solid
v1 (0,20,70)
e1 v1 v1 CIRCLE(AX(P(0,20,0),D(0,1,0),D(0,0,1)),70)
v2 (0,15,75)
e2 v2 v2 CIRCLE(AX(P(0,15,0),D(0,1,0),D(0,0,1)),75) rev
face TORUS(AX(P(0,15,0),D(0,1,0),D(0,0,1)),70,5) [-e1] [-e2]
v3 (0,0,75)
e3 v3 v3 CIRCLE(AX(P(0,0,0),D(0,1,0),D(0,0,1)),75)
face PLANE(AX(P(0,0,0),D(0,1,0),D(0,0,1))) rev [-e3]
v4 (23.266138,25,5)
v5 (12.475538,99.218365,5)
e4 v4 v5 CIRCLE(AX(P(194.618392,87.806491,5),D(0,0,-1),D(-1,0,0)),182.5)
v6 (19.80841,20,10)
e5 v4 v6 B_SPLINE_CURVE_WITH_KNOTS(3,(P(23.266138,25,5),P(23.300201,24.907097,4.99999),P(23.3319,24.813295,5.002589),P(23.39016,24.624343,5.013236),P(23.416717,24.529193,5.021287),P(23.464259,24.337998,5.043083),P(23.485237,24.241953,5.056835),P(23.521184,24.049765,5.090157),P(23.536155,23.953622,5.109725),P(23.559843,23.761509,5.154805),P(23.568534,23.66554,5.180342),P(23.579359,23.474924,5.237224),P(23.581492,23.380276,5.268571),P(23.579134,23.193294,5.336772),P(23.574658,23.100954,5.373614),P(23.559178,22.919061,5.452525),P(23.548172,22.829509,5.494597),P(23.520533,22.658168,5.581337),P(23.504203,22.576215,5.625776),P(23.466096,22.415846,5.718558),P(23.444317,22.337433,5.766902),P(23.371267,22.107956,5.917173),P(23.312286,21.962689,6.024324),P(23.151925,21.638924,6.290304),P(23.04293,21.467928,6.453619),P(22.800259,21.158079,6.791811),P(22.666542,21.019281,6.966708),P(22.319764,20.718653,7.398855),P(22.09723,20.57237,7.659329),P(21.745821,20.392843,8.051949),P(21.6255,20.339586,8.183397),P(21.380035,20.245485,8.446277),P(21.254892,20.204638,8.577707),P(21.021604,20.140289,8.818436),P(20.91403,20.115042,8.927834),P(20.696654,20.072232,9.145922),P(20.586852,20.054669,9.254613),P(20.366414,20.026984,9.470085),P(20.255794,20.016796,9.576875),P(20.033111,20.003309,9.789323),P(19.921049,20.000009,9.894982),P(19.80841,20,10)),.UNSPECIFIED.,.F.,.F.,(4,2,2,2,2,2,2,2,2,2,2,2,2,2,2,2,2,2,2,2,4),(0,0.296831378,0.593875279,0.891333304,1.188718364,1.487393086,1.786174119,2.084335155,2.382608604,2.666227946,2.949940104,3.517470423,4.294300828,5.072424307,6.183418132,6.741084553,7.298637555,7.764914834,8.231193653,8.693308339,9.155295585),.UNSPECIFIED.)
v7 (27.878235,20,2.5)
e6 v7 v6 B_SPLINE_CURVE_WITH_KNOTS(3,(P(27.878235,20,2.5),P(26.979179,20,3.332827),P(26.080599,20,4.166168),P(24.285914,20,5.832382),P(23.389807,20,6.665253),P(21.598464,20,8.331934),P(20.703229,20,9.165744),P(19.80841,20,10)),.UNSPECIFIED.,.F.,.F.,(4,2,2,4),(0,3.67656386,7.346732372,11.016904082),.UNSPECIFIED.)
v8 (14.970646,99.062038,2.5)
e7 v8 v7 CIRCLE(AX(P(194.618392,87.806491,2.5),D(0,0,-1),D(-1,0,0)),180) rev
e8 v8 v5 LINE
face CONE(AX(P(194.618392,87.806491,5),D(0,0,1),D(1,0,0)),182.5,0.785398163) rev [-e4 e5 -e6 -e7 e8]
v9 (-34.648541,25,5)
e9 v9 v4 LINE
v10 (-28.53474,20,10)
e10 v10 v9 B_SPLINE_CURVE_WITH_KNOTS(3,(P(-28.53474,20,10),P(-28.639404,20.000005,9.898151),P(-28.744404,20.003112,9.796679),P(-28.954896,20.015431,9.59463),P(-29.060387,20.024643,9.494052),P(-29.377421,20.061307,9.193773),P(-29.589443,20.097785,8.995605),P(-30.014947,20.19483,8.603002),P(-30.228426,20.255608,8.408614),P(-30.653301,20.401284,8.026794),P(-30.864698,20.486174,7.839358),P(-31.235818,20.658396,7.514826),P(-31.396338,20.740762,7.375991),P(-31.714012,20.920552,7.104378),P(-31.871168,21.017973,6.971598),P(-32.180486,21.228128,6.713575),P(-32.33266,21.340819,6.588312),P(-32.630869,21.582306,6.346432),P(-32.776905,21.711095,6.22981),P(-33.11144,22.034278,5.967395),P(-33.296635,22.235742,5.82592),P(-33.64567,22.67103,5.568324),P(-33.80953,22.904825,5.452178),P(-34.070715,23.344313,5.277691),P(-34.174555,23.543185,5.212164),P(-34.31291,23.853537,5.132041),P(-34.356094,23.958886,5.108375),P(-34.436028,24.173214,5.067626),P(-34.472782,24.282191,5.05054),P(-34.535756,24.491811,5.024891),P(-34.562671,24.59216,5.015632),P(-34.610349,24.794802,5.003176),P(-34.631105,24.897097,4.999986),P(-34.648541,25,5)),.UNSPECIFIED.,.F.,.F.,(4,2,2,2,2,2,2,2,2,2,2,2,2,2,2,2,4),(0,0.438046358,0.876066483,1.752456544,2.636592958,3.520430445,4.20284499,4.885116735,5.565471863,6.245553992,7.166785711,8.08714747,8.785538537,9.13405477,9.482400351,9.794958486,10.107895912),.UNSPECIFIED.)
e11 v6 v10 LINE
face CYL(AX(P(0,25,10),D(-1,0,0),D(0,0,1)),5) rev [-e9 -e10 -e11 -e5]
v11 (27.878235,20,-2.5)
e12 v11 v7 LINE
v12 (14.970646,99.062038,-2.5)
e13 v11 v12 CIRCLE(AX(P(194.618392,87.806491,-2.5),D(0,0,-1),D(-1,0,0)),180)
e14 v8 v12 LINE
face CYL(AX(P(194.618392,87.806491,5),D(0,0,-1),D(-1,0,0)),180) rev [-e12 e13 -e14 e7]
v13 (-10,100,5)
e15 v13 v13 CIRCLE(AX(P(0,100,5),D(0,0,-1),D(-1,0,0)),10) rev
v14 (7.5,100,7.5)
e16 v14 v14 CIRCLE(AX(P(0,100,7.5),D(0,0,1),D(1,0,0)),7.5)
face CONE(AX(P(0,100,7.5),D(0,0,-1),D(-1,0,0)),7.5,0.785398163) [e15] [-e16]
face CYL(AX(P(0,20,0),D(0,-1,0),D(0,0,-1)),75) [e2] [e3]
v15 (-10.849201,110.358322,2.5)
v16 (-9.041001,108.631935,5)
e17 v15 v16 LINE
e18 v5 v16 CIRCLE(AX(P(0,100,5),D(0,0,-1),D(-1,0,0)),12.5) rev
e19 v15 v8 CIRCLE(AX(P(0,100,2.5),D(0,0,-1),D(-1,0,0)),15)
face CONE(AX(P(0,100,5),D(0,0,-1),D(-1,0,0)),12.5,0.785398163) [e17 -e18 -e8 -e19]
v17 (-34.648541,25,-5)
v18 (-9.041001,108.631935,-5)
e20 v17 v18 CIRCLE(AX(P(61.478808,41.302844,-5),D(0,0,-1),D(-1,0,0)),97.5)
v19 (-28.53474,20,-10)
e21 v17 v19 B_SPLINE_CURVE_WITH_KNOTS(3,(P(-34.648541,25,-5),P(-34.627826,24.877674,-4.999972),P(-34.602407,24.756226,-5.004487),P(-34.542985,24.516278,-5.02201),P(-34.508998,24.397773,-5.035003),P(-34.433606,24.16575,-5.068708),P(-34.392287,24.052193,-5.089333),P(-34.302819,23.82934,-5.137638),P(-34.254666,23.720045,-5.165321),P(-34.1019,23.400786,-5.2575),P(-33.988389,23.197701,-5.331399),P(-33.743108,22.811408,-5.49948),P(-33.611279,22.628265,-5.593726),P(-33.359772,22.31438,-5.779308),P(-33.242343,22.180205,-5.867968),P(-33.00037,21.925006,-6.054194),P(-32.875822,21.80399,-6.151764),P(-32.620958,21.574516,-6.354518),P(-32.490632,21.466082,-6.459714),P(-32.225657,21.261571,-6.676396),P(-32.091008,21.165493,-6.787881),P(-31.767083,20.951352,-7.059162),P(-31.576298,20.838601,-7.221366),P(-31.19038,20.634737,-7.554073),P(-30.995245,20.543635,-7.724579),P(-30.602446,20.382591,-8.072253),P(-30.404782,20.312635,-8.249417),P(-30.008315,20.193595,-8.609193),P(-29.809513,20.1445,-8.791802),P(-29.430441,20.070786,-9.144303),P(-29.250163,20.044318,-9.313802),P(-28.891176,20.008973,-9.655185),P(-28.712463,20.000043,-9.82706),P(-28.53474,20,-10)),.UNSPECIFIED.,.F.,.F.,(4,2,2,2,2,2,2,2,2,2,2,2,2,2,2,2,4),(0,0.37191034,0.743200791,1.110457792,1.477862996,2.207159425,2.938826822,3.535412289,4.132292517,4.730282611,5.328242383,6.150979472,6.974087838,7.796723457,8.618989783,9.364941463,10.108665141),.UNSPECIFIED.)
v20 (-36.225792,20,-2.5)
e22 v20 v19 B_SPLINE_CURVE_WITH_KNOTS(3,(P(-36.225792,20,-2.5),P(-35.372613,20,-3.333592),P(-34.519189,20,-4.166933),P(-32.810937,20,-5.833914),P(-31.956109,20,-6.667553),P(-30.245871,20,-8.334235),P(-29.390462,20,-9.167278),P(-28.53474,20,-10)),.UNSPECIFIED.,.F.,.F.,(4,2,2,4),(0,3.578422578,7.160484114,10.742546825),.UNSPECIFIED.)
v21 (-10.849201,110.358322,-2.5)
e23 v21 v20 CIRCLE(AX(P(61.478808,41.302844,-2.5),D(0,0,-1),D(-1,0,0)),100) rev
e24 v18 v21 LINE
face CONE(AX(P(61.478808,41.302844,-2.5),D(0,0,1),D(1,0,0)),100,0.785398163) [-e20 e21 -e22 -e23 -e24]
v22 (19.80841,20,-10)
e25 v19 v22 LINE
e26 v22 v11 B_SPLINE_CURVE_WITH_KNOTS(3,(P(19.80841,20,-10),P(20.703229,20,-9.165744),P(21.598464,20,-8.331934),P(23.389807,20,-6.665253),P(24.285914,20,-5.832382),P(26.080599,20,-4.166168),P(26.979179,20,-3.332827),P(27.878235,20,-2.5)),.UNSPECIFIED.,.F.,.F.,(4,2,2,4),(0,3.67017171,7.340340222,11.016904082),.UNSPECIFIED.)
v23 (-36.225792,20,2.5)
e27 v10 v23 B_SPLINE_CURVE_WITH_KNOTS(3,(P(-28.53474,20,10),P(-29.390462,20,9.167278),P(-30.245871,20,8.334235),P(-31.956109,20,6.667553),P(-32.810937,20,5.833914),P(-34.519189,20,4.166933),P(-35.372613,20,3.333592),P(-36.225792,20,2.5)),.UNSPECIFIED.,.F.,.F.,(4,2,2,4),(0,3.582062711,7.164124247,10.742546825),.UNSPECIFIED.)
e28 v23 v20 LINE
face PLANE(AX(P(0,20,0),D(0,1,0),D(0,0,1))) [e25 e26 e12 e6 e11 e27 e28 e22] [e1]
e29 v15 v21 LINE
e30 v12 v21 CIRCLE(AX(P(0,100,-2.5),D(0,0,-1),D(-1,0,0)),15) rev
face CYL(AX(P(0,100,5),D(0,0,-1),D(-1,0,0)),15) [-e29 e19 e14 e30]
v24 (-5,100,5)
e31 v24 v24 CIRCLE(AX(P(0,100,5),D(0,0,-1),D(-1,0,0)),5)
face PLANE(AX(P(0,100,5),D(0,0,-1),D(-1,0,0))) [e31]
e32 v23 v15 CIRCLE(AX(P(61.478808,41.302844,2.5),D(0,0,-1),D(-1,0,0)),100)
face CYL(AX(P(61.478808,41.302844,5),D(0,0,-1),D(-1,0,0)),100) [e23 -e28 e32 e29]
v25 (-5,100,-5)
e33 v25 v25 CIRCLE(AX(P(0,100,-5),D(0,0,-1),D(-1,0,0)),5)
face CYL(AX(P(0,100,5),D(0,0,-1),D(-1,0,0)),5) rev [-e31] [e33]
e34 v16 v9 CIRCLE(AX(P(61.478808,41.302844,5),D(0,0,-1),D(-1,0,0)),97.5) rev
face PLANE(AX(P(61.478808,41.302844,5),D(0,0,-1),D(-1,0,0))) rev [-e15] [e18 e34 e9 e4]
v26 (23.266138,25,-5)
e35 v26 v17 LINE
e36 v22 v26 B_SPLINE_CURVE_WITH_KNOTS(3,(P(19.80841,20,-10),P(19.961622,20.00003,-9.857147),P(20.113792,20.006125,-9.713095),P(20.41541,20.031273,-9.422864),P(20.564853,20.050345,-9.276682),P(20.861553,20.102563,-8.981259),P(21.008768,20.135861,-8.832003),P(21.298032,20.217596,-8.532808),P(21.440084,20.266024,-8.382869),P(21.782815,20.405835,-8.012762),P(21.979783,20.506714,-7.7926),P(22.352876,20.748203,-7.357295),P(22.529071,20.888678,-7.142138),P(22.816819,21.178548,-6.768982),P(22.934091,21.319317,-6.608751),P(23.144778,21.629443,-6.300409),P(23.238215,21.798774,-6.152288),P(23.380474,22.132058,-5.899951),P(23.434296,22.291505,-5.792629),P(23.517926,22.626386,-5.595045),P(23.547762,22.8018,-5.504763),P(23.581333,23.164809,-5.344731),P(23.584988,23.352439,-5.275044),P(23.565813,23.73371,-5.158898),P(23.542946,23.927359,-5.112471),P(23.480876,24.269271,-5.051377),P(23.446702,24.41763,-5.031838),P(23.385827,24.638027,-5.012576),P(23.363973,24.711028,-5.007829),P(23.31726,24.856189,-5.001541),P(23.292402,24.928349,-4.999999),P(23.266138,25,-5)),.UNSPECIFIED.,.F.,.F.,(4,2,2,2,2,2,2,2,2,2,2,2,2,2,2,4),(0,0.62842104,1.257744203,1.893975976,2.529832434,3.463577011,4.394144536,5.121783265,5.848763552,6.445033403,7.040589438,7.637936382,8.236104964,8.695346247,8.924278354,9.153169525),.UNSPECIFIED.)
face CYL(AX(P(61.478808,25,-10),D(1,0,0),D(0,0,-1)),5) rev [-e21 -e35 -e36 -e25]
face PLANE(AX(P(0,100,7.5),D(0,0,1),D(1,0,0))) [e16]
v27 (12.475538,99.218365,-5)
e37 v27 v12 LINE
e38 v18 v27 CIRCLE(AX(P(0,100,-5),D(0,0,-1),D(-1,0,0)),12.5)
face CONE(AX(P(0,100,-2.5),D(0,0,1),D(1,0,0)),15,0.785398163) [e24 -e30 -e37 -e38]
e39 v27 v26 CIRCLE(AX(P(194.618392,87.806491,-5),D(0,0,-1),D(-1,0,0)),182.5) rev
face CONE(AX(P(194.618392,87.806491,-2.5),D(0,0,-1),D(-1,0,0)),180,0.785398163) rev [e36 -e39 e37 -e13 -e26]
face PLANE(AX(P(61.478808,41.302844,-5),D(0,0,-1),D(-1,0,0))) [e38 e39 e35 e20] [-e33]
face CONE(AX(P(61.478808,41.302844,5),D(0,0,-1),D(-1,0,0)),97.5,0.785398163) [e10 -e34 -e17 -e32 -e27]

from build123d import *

# Parameters (mm, degrees)
SKETCH2_R           = 75
BOSS_EXTRUDE1_DEPTH = 20
FILLET1_R           = 5
BOSS_EXTRUDE2_DEPTH = 5
CHAMFER4_SIZE       = 2.5
FILLET2_R           = 5
SKETCH7_R           = 10
BOSS_EXTRUDE3_DEPTH = 2.5
CHAMFER5_SIZE       = 2.5
SKETCH8_R           = 5
CUT_EXTRUDE1_DEPTH  = 10


with BuildPart() as part:
    # Sketch2 → Boss-Extrude1 (new body)
    with BuildSketch(Plane(origin=(0, 0, 0), x_dir=(1, 0, 0), z_dir=(0, 1, 0))):
        with Locations(Location((0, 0, 0), (0, 0, 270))):
            Circle(SKETCH2_R)
    extrude(amount=BOSS_EXTRUDE1_DEPTH)

    # Fillet1
    fillet1_edges = [part.edges().sort_by_distance(p)[0] for p in [
        (0, 20, -75),
    ]]
    fillet(fillet1_edges, radius=FILLET1_R)

    # Sketch3 → Boss-Extrude2 (add, symmetric)
    with BuildSketch(Plane.XY):
        with BuildLine():
            Line((-35, 15), (30, 15))
            ThreePointArc((30, 15), (17.428098582, 56.126843631), (14.970645506, 99.06203778))
            ThreePointArc((14.970645506, 99.06203778), (6.012327577, 113.742340307), (-10.849201429, 110.358321696))
            ThreePointArc((-10.849201429, 110.358321696), (-35.460543036, 65.854059614), (-35, 15))
        make_face()
    extrude(amount=BOSS_EXTRUDE2_DEPTH, both=True)

    # Chamfer4
    chamfer4_edges = [part.edges().sort_by_distance(p)[0] for p in [
        (-34.796467261, 68.341174934, -5),
        (16.970295051, 58.803839559, -5),
        (6.012327577, 113.742340307, -5),
        (16.970295051, 58.803839559, 5),
        (6.012327577, 113.742340307, 5),
        (-34.796467261, 68.341174934, 5),
    ]]
    chamfer(chamfer4_edges, length=CHAMFER4_SIZE)

    # Fillet2
    fillet2_edges = [part.edges().sort_by_distance(p)[0] for p in [
        (-4.241511046, 20, 5),
        (-4.241511046, 20, -5),
    ]]
    fillet(fillet2_edges, radius=FILLET2_R)

    # Sketch7 → Boss-Extrude3 (add, symmetric)
    with BuildSketch(Plane.XY.offset(5)):
        with Locations(Location((0, 100, 0), (0, 0, 180))):
            Circle(SKETCH7_R)
    extrude(amount=BOSS_EXTRUDE3_DEPTH, both=True)

    # Chamfer5
    chamfer5_edges = [part.edges().sort_by_distance(p)[0] for p in [
        (10, 100, 7.5),
    ]]
    chamfer(chamfer5_edges, length=CHAMFER5_SIZE - 0.0001)  # a hair under: the kernel refuses the full size

    # Sketch8 → Cut-Extrude1 (cut)
    with BuildSketch(Plane(origin=(0, 0, -5), x_dir=(-1, 0, 0), z_dir=(0, 0, -1))):
        with Locations((0, 100)):
            Circle(SKETCH8_R)
    extrude(amount=-CUT_EXTRUDE1_DEPTH, mode=Mode.SUBTRACT)


solid = part.part
